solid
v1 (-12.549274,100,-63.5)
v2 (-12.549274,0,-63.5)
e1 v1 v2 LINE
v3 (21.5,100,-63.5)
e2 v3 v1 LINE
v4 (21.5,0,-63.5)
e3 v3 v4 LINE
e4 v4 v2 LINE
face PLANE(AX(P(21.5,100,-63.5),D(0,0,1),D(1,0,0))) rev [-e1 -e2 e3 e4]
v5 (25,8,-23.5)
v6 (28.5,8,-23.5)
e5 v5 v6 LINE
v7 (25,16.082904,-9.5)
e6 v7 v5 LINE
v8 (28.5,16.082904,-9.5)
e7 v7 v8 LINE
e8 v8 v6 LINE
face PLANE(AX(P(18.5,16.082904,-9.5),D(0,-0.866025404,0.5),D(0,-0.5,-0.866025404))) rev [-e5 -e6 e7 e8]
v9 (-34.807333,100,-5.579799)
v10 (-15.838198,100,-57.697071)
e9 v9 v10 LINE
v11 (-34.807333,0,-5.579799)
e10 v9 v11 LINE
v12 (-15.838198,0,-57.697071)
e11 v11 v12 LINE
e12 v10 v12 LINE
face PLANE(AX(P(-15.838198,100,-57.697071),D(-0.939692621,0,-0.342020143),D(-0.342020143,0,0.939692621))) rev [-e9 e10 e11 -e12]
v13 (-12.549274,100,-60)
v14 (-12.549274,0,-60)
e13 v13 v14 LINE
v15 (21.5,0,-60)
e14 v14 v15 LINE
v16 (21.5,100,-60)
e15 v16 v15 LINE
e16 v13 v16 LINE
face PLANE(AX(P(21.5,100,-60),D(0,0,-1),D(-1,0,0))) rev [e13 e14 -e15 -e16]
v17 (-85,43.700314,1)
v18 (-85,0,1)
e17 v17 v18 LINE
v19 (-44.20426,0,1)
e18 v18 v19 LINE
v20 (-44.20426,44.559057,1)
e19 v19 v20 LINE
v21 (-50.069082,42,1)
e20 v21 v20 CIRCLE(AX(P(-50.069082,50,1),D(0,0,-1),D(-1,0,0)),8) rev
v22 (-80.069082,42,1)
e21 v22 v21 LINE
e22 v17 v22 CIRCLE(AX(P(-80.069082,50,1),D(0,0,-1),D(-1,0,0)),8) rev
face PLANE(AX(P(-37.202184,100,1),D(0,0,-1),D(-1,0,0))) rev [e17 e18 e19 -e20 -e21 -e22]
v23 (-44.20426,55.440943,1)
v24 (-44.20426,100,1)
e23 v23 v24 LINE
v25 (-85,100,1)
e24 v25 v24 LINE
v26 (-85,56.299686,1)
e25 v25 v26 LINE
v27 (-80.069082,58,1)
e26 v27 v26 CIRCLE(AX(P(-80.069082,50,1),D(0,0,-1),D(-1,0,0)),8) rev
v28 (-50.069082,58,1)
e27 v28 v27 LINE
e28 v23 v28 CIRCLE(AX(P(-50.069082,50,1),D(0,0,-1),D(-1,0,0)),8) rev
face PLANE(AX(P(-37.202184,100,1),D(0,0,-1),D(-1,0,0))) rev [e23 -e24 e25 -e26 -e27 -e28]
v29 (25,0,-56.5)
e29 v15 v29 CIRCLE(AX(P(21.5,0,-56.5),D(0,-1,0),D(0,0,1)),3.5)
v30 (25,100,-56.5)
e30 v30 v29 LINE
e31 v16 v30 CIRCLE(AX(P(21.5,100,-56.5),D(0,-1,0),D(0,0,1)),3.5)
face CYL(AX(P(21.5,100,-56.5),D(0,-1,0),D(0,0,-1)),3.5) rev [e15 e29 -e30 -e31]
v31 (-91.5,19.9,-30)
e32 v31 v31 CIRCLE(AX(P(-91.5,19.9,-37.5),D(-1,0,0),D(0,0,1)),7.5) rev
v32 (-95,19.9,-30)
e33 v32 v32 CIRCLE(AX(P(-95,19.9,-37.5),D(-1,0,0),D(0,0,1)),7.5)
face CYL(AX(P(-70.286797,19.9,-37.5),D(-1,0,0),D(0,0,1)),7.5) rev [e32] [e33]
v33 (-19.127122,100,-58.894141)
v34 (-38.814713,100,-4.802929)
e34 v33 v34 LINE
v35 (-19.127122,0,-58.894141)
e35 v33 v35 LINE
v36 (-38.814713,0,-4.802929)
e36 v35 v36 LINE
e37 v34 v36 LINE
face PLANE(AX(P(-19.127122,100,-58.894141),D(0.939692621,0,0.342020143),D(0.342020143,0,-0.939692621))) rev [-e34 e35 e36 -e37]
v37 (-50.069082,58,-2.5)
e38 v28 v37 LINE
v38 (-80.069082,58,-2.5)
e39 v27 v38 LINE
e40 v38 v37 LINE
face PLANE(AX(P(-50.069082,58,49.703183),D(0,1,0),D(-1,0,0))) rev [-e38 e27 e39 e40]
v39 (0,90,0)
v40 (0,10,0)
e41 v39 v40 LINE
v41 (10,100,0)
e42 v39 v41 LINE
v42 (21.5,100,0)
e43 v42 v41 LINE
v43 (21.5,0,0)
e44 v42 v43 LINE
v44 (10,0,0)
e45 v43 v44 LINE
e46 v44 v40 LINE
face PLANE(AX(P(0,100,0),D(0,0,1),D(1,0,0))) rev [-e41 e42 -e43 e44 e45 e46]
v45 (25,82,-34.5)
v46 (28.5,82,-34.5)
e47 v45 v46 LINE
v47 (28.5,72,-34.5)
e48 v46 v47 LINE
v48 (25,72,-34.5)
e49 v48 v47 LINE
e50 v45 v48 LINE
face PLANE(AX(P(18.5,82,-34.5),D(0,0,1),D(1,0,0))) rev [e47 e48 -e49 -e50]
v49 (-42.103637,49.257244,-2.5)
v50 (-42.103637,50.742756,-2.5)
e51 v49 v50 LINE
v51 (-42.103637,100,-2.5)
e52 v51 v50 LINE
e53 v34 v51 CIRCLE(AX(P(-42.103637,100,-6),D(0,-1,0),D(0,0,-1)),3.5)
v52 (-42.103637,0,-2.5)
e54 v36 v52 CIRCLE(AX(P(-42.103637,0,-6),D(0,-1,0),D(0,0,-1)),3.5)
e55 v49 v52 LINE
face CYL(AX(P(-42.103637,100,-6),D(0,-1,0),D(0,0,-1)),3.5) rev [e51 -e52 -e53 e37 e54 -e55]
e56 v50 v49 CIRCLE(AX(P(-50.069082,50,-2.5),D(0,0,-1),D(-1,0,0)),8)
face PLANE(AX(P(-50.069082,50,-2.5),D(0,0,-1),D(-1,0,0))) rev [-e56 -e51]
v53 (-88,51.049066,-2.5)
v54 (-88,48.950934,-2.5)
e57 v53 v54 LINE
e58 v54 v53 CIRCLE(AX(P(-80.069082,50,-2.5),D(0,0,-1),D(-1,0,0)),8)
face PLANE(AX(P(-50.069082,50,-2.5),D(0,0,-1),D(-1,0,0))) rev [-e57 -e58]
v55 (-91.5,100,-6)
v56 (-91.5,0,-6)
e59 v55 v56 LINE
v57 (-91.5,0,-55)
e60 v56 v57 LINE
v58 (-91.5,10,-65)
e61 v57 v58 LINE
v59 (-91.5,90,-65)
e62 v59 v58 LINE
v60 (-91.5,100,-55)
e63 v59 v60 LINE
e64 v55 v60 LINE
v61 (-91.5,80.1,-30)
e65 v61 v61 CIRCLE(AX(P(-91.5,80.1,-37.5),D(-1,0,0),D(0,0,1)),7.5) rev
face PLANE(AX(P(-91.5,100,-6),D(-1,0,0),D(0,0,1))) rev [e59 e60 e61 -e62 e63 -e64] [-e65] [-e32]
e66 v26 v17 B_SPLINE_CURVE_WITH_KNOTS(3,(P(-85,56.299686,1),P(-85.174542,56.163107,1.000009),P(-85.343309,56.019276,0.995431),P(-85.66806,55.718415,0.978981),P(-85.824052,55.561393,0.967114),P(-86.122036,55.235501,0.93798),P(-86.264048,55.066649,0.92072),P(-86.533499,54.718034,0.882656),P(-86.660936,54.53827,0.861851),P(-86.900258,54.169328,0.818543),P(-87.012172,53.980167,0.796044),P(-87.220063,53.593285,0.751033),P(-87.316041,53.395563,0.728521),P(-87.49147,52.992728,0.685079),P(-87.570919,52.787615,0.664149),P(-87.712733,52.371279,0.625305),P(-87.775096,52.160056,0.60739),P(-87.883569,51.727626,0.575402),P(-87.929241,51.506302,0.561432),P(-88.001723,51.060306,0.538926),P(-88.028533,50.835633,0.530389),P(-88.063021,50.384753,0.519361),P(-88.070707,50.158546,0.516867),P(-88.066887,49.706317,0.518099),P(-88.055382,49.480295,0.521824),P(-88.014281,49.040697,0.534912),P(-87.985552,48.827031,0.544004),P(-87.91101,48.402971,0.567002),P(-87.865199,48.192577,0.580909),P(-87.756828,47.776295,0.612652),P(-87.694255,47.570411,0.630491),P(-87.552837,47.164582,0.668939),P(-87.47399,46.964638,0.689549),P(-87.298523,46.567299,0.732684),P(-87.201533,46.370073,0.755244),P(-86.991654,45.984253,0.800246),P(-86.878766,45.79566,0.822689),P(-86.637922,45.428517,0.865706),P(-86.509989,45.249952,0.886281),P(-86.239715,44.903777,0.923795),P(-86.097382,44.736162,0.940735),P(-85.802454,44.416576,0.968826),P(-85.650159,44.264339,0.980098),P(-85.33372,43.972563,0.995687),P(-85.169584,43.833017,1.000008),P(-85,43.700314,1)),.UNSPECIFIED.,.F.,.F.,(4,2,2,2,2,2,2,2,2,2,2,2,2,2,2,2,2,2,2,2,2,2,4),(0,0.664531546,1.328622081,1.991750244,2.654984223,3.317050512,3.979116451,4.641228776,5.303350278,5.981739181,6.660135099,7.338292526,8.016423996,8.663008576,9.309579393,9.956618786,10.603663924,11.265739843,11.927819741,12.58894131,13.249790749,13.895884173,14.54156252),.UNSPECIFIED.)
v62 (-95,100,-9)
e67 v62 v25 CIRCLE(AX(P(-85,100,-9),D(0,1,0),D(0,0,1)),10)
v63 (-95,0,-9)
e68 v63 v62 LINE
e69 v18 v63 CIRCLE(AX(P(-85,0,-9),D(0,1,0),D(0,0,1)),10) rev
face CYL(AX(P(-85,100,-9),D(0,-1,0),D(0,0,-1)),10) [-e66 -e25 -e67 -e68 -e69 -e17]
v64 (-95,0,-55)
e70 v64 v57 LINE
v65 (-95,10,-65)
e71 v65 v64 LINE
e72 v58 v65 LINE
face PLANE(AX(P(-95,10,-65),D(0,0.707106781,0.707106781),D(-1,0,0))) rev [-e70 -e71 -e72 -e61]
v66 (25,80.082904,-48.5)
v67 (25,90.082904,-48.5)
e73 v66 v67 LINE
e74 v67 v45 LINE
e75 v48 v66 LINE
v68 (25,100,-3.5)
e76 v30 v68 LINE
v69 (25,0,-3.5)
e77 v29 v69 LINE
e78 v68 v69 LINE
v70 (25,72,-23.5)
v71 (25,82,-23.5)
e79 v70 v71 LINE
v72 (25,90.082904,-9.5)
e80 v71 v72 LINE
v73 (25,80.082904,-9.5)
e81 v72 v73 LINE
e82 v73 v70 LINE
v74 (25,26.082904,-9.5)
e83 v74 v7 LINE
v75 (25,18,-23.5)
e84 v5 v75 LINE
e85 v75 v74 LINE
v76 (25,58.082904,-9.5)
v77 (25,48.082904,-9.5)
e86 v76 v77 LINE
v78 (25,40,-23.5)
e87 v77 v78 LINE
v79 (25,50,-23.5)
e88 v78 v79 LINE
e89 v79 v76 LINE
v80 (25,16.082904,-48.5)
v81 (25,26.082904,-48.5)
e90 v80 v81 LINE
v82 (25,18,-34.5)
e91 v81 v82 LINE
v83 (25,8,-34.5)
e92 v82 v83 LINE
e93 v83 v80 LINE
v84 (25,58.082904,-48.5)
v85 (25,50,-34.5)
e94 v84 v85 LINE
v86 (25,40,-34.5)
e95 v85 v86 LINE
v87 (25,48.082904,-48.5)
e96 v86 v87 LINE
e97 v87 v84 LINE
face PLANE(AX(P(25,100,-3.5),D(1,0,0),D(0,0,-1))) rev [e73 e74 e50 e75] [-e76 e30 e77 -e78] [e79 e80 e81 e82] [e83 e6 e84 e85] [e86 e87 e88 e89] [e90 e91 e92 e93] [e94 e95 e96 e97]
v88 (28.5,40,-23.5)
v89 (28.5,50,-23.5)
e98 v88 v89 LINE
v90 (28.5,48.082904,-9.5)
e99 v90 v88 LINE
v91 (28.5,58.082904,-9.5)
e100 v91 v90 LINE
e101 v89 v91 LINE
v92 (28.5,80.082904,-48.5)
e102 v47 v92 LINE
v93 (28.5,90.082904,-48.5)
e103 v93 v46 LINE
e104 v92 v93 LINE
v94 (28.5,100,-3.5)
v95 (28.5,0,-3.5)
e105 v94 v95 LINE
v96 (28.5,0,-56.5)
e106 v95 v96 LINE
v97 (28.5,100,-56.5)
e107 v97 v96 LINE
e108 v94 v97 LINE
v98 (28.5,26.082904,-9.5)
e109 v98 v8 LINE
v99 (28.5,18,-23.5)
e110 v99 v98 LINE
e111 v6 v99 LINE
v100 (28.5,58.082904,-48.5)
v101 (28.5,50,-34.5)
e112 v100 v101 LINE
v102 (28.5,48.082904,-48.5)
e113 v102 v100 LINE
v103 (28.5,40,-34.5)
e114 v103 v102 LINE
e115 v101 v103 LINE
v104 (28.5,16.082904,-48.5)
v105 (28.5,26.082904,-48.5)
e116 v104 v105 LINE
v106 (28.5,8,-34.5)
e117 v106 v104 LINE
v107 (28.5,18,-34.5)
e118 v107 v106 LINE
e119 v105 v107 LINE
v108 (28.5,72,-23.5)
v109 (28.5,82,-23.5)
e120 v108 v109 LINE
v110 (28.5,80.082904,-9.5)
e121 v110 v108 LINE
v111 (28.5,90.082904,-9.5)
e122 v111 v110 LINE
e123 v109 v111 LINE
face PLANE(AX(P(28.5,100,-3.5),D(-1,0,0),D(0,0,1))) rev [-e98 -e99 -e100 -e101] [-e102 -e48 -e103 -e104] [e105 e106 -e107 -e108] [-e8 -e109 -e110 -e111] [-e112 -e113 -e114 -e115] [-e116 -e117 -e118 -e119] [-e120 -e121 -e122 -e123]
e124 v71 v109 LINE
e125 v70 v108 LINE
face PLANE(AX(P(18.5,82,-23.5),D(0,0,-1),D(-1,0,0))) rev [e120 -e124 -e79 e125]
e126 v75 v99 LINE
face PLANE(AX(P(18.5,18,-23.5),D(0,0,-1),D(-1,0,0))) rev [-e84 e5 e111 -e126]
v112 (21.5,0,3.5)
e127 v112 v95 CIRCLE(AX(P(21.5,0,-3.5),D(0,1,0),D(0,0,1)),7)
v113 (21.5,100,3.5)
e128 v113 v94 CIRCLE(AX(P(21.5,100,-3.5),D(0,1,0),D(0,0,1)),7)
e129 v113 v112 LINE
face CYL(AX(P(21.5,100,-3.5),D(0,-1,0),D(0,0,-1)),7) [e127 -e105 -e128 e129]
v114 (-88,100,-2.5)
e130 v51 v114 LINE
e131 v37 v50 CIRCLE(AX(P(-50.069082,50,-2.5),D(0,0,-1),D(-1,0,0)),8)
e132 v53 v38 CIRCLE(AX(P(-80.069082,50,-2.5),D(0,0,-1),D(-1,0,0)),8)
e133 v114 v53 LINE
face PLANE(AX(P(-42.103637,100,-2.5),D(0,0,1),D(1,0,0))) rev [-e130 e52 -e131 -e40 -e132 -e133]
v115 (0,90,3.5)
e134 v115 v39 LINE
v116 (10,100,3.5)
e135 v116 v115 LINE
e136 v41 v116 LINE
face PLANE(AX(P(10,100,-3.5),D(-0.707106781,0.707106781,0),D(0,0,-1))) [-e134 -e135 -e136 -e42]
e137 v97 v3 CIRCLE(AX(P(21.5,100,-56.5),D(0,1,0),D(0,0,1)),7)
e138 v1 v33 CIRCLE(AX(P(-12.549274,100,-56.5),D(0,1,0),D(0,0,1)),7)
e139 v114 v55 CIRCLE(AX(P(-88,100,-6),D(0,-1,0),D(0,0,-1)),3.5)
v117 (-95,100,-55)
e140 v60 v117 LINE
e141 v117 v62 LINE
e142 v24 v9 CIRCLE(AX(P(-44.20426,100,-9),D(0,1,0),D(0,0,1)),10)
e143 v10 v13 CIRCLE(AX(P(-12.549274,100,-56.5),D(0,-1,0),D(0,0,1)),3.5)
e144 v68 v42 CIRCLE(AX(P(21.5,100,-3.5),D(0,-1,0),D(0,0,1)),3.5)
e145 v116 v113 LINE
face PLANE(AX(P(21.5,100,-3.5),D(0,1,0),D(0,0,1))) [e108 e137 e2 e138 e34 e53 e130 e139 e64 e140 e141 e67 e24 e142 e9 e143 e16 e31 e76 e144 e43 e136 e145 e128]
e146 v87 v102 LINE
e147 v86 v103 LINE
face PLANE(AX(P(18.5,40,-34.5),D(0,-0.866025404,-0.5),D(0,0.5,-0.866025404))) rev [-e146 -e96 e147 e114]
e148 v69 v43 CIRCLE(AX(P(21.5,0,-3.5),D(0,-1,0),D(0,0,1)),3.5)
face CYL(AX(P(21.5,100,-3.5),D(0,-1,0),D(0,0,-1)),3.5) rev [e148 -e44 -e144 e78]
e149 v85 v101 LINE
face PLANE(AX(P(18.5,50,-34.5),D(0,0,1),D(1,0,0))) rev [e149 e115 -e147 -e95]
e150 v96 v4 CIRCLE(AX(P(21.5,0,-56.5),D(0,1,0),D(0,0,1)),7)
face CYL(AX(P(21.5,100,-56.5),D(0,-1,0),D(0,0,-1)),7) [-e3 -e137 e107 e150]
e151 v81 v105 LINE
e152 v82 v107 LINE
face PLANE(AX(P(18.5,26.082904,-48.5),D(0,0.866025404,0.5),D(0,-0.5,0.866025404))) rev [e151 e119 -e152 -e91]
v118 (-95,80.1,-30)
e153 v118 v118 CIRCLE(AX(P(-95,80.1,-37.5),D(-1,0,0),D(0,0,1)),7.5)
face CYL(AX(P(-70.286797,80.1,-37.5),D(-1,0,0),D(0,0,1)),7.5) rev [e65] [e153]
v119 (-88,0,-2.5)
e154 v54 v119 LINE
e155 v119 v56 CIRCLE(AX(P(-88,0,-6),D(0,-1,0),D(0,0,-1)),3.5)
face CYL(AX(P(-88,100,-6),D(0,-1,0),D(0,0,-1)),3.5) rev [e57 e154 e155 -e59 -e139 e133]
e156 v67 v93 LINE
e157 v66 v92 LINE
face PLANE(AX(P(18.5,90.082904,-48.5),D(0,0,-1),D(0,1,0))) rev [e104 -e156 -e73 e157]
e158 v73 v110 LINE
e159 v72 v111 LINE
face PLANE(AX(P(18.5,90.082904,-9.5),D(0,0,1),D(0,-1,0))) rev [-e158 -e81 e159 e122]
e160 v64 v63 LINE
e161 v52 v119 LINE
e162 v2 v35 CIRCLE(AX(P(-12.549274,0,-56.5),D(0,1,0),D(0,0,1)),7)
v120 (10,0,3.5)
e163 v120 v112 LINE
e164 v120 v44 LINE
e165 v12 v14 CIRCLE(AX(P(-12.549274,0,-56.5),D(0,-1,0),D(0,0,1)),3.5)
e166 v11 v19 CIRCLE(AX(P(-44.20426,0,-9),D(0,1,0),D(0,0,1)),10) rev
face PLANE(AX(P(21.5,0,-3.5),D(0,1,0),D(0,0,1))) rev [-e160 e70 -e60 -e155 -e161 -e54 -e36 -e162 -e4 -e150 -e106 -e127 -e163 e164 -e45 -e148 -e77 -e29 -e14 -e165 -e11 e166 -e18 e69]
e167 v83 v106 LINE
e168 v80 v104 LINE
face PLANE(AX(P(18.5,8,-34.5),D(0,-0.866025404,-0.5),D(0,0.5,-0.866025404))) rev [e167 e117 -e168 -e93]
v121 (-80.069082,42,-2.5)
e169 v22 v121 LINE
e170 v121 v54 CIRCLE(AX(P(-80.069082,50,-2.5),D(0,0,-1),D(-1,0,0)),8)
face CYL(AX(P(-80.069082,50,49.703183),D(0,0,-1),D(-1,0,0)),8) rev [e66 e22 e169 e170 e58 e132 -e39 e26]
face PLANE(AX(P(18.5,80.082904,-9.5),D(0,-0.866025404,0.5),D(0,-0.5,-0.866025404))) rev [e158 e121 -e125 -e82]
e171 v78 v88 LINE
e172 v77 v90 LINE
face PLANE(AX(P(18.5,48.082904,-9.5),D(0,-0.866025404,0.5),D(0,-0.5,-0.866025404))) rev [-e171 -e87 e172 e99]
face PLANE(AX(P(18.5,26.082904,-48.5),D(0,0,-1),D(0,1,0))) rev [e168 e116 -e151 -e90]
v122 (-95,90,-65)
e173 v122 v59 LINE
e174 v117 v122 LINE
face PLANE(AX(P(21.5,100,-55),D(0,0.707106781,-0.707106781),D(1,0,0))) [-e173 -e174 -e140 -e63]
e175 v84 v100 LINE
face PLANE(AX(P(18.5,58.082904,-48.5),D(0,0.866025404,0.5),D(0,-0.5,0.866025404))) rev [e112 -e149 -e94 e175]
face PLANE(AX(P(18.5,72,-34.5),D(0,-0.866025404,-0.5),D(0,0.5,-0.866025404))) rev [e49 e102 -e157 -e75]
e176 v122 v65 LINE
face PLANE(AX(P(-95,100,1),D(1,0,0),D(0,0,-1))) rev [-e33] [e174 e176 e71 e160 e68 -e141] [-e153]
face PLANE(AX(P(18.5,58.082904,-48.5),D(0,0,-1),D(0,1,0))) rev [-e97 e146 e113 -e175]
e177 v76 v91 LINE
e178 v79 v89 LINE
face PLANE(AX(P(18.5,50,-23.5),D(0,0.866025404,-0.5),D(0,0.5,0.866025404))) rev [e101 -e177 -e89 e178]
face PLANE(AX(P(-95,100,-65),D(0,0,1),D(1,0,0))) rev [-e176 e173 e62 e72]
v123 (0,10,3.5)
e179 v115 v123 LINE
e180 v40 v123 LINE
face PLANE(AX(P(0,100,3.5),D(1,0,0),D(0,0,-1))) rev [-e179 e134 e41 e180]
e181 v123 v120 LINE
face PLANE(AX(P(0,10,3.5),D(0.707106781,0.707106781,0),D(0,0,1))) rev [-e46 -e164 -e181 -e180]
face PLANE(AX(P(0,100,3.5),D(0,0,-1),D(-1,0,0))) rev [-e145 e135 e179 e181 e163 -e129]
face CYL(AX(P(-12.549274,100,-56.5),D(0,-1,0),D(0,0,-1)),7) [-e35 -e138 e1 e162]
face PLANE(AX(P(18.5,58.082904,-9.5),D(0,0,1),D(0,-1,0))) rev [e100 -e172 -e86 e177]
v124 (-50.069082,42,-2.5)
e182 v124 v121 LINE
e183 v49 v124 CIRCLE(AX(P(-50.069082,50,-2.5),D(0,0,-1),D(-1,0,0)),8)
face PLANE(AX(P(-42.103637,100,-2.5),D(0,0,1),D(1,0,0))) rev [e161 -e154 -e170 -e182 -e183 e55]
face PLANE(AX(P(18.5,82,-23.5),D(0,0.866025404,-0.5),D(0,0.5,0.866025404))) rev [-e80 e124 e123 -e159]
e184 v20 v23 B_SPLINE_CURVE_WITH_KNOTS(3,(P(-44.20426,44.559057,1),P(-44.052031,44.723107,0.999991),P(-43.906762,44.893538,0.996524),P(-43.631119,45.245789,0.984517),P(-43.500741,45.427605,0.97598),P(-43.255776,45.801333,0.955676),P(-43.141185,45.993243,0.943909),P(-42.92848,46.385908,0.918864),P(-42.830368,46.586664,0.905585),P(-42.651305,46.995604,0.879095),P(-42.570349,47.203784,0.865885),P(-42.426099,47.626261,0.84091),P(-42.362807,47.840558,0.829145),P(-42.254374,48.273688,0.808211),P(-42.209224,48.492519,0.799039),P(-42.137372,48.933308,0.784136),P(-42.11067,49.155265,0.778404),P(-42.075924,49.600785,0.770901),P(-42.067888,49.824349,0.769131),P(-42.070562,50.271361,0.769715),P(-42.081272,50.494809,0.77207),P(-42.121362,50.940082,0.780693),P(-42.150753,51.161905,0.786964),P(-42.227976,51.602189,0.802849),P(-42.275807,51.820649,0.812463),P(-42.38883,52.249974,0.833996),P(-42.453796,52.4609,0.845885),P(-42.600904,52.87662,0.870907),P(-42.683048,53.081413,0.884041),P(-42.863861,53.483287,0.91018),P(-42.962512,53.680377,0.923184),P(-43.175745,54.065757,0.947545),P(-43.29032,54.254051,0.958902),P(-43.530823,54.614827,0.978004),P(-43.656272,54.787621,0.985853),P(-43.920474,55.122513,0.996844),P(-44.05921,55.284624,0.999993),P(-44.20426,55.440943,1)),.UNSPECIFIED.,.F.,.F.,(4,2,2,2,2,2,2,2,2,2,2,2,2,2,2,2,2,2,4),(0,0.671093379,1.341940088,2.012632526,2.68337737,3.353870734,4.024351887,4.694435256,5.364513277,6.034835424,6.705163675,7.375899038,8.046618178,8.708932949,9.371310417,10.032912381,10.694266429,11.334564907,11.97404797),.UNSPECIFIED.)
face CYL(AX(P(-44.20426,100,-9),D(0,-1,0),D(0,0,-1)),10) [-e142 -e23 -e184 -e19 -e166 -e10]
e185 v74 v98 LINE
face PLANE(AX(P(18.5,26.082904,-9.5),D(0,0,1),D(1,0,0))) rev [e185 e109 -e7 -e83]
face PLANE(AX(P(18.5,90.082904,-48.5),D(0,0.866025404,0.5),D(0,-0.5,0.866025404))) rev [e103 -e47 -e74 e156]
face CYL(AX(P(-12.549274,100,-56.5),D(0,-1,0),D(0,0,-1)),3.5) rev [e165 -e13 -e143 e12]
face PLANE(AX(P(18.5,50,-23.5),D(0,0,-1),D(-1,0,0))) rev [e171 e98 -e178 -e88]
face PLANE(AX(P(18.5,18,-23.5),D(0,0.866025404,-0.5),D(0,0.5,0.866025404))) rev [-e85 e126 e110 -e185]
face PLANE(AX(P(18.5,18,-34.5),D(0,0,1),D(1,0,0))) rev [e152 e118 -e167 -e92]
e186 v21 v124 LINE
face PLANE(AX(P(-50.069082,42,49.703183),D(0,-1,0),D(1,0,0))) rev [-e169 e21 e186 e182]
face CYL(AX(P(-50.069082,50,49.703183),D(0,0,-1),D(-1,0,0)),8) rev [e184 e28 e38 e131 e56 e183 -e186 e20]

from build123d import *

# Parameters (mm, degrees)
BOSS_EXTRUDE2_DEPTH = 100
CHAMFER1_SIZE       = 10
SKETCH2_R           = 7.5
CUT_EXTRUDE1_DEPTH  = 3.5
CUT_EXTRUDE2_DEPTH  = 3.5
CUT_EXTRUDE3_DEPTH  = 10
FILLET1_R           = 10


with BuildPart() as part:
    # Sketch1 → Boss-Extrude2 (new body)
    with BuildSketch(Plane(origin=(0, 0, 0), x_dir=(1, 0, 0), z_dir=(0, 1, 0))):
        with BuildLine():
            Line((0, 0), (21.5, 0))
            ThreePointArc((21.5, 0), (23.974873734, 1.025126266), (25, 3.5))
            Line((25, 3.5), (25, 56.5))
            ThreePointArc((25, 56.5), (23.974873734, 58.974873734), (21.5, 60))
            Line((21.5, 60), (-12.549273616, 60))
            ThreePointArc((-12.549273616, 60), (-14.556791143, 59.367032155), (-15.838197789, 57.697070502))
            Line((-15.838197789, 57.697070502), (-37.20218429, -1))
            Line((-37.20218429, -1), (-95, -1))
            Line((-95, -1), (-95, 65))
            Line((-95, 65), (-91.5, 65))
            Line((-91.5, 65), (-91.5, 6))
            ThreePointArc((-91.5, 6), (-90.474873734, 3.525126266), (-88, 2.5))
            Line((-88, 2.5), (-42.103637058, 2.5))
            ThreePointArc((-42.103637058, 2.5), (-40.09611953, 3.132967845), (-38.814712885, 4.802929498))
            Line((-38.814712885, 4.802929498), (-19.127121962, 58.894141003))
            ThreePointArc((-19.127121962, 58.894141003), (-16.564308671, 62.23406431), (-12.549273616, 63.5))
            Line((-12.549273616, 63.5), (21.5, 63.5))
            ThreePointArc((21.5, 63.5), (26.449747468, 61.449747468), (28.5, 56.5))
            Line((28.5, 56.5), (28.5, 3.5))
            ThreePointArc((28.5, 3.5), (26.449747468, -1.449747468), (21.5, -3.5))
            Line((21.5, -3.5), (0, -3.5))
            Line((0, -3.5), (0, 0))
        make_face()
    extrude(amount=BOSS_EXTRUDE2_DEPTH)

    # Chamfer1
    chamfer1_edges = [part.edges().sort_by_distance(p)[0] for p in [
        (-93.25, 0, -65),
        (0, 0, 1.75),
        (0, 100, 1.75),
        (-93.25, 100, -65),
    ]]
    chamfer(chamfer1_edges, length=CHAMFER1_SIZE)

    # Sketch2 → Cut-Extrude1 (cut)
    with BuildSketch(Plane.ZY.offset(95)):
        with Locations((-37.5, 19.9)):
            Circle(SKETCH2_R)
        with Locations((-37.5, 80.1)):
            Circle(SKETCH2_R)
    extrude(amount=-CUT_EXTRUDE1_DEPTH, mode=Mode.SUBTRACT)

    # Sketch3 → Cut-Extrude2 (cut)
    with BuildSketch(Plane(origin=(0, 0, -2.5), x_dir=(-1, 0, 0), z_dir=(0, 0, -1))):
        with BuildLine():
            Line((50.069082037, 58), (80.069082037, 58))
            ThreePointArc((80.069082037, 58), (88.069082037, 50), (80.069082037, 42))
            Line((80.069082037, 42), (50.069082037, 42))
            ThreePointArc((50.069082037, 42), (42.069082037, 50), (50.069082037, 58))
        make_face()
    extrude(amount=-CUT_EXTRUDE2_DEPTH, mode=Mode.SUBTRACT)

    # Sketch4 → Cut-Extrude3 (cut)
    with BuildSketch(Plane(origin=(28.5, 0, 0), x_dir=(0, 0, -1), z_dir=(1, 0, 0))):
        Polygon((48.5, 26.082903769), (48.5, 16.082903769), (34.5, 8), (34.5, 18), align=None)
        Polygon((23.5, 18), (23.5, 8), (9.5, 16.082903769), (9.5, 26.082903769), align=None)
        Polygon((48.5, 58.082903769), (48.5, 48.082903769), (34.5, 40), (34.5, 50), align=None)
        Polygon((23.5, 50), (23.5, 40), (9.5, 48.082903769), (9.5, 58.082903769), align=None)
        Polygon((48.5, 90.082903769), (48.5, 80.082903769), (34.5, 72), (34.5, 82), align=None)
        Polygon((23.5, 82), (23.5, 72), (9.5, 80.082903769), (9.5, 90.082903769), align=None)
    extrude(amount=-CUT_EXTRUDE3_DEPTH, mode=Mode.SUBTRACT)

    # Fillet1
    # the kernel refuses this fillet: 10 mm, written as the material it takes off along each edge
    with BuildSketch(Plane(origin=(-37.20218429, -17.505188455, 1), x_dir=(0.3420201433256651, 0, -0.9396926207859098), z_dir=(0, 1, 0))) as fillet1_piece_1:
        with BuildLine():
            CenterArc((FILLET1_R * 0.70020753821, FILLET1_R), FILLET1_R, 200, 70)
            Line((-FILLET1_R * 0.239485082576, FILLET1_R * 0.657979856674), (0, 0))
            Line((0, 0), (FILLET1_R * 0.70020753821, 0))
        make_face()
    extrude(amount=135.01037691, mode=Mode.SUBTRACT)
    with BuildSketch(Plane(origin=(-95, -25, 1), x_dir=(1, 0, 0), z_dir=(0, 1, 0))) as fillet1_piece_2:
        with BuildLine():
            CenterArc((FILLET1_R, FILLET1_R), FILLET1_R, 180, 90)
            Line((0, FILLET1_R), (0, 0))
            Line((0, 0), (FILLET1_R, 0))
        make_face()
    extrude(amount=150, mode=Mode.SUBTRACT)


solid = part.part
